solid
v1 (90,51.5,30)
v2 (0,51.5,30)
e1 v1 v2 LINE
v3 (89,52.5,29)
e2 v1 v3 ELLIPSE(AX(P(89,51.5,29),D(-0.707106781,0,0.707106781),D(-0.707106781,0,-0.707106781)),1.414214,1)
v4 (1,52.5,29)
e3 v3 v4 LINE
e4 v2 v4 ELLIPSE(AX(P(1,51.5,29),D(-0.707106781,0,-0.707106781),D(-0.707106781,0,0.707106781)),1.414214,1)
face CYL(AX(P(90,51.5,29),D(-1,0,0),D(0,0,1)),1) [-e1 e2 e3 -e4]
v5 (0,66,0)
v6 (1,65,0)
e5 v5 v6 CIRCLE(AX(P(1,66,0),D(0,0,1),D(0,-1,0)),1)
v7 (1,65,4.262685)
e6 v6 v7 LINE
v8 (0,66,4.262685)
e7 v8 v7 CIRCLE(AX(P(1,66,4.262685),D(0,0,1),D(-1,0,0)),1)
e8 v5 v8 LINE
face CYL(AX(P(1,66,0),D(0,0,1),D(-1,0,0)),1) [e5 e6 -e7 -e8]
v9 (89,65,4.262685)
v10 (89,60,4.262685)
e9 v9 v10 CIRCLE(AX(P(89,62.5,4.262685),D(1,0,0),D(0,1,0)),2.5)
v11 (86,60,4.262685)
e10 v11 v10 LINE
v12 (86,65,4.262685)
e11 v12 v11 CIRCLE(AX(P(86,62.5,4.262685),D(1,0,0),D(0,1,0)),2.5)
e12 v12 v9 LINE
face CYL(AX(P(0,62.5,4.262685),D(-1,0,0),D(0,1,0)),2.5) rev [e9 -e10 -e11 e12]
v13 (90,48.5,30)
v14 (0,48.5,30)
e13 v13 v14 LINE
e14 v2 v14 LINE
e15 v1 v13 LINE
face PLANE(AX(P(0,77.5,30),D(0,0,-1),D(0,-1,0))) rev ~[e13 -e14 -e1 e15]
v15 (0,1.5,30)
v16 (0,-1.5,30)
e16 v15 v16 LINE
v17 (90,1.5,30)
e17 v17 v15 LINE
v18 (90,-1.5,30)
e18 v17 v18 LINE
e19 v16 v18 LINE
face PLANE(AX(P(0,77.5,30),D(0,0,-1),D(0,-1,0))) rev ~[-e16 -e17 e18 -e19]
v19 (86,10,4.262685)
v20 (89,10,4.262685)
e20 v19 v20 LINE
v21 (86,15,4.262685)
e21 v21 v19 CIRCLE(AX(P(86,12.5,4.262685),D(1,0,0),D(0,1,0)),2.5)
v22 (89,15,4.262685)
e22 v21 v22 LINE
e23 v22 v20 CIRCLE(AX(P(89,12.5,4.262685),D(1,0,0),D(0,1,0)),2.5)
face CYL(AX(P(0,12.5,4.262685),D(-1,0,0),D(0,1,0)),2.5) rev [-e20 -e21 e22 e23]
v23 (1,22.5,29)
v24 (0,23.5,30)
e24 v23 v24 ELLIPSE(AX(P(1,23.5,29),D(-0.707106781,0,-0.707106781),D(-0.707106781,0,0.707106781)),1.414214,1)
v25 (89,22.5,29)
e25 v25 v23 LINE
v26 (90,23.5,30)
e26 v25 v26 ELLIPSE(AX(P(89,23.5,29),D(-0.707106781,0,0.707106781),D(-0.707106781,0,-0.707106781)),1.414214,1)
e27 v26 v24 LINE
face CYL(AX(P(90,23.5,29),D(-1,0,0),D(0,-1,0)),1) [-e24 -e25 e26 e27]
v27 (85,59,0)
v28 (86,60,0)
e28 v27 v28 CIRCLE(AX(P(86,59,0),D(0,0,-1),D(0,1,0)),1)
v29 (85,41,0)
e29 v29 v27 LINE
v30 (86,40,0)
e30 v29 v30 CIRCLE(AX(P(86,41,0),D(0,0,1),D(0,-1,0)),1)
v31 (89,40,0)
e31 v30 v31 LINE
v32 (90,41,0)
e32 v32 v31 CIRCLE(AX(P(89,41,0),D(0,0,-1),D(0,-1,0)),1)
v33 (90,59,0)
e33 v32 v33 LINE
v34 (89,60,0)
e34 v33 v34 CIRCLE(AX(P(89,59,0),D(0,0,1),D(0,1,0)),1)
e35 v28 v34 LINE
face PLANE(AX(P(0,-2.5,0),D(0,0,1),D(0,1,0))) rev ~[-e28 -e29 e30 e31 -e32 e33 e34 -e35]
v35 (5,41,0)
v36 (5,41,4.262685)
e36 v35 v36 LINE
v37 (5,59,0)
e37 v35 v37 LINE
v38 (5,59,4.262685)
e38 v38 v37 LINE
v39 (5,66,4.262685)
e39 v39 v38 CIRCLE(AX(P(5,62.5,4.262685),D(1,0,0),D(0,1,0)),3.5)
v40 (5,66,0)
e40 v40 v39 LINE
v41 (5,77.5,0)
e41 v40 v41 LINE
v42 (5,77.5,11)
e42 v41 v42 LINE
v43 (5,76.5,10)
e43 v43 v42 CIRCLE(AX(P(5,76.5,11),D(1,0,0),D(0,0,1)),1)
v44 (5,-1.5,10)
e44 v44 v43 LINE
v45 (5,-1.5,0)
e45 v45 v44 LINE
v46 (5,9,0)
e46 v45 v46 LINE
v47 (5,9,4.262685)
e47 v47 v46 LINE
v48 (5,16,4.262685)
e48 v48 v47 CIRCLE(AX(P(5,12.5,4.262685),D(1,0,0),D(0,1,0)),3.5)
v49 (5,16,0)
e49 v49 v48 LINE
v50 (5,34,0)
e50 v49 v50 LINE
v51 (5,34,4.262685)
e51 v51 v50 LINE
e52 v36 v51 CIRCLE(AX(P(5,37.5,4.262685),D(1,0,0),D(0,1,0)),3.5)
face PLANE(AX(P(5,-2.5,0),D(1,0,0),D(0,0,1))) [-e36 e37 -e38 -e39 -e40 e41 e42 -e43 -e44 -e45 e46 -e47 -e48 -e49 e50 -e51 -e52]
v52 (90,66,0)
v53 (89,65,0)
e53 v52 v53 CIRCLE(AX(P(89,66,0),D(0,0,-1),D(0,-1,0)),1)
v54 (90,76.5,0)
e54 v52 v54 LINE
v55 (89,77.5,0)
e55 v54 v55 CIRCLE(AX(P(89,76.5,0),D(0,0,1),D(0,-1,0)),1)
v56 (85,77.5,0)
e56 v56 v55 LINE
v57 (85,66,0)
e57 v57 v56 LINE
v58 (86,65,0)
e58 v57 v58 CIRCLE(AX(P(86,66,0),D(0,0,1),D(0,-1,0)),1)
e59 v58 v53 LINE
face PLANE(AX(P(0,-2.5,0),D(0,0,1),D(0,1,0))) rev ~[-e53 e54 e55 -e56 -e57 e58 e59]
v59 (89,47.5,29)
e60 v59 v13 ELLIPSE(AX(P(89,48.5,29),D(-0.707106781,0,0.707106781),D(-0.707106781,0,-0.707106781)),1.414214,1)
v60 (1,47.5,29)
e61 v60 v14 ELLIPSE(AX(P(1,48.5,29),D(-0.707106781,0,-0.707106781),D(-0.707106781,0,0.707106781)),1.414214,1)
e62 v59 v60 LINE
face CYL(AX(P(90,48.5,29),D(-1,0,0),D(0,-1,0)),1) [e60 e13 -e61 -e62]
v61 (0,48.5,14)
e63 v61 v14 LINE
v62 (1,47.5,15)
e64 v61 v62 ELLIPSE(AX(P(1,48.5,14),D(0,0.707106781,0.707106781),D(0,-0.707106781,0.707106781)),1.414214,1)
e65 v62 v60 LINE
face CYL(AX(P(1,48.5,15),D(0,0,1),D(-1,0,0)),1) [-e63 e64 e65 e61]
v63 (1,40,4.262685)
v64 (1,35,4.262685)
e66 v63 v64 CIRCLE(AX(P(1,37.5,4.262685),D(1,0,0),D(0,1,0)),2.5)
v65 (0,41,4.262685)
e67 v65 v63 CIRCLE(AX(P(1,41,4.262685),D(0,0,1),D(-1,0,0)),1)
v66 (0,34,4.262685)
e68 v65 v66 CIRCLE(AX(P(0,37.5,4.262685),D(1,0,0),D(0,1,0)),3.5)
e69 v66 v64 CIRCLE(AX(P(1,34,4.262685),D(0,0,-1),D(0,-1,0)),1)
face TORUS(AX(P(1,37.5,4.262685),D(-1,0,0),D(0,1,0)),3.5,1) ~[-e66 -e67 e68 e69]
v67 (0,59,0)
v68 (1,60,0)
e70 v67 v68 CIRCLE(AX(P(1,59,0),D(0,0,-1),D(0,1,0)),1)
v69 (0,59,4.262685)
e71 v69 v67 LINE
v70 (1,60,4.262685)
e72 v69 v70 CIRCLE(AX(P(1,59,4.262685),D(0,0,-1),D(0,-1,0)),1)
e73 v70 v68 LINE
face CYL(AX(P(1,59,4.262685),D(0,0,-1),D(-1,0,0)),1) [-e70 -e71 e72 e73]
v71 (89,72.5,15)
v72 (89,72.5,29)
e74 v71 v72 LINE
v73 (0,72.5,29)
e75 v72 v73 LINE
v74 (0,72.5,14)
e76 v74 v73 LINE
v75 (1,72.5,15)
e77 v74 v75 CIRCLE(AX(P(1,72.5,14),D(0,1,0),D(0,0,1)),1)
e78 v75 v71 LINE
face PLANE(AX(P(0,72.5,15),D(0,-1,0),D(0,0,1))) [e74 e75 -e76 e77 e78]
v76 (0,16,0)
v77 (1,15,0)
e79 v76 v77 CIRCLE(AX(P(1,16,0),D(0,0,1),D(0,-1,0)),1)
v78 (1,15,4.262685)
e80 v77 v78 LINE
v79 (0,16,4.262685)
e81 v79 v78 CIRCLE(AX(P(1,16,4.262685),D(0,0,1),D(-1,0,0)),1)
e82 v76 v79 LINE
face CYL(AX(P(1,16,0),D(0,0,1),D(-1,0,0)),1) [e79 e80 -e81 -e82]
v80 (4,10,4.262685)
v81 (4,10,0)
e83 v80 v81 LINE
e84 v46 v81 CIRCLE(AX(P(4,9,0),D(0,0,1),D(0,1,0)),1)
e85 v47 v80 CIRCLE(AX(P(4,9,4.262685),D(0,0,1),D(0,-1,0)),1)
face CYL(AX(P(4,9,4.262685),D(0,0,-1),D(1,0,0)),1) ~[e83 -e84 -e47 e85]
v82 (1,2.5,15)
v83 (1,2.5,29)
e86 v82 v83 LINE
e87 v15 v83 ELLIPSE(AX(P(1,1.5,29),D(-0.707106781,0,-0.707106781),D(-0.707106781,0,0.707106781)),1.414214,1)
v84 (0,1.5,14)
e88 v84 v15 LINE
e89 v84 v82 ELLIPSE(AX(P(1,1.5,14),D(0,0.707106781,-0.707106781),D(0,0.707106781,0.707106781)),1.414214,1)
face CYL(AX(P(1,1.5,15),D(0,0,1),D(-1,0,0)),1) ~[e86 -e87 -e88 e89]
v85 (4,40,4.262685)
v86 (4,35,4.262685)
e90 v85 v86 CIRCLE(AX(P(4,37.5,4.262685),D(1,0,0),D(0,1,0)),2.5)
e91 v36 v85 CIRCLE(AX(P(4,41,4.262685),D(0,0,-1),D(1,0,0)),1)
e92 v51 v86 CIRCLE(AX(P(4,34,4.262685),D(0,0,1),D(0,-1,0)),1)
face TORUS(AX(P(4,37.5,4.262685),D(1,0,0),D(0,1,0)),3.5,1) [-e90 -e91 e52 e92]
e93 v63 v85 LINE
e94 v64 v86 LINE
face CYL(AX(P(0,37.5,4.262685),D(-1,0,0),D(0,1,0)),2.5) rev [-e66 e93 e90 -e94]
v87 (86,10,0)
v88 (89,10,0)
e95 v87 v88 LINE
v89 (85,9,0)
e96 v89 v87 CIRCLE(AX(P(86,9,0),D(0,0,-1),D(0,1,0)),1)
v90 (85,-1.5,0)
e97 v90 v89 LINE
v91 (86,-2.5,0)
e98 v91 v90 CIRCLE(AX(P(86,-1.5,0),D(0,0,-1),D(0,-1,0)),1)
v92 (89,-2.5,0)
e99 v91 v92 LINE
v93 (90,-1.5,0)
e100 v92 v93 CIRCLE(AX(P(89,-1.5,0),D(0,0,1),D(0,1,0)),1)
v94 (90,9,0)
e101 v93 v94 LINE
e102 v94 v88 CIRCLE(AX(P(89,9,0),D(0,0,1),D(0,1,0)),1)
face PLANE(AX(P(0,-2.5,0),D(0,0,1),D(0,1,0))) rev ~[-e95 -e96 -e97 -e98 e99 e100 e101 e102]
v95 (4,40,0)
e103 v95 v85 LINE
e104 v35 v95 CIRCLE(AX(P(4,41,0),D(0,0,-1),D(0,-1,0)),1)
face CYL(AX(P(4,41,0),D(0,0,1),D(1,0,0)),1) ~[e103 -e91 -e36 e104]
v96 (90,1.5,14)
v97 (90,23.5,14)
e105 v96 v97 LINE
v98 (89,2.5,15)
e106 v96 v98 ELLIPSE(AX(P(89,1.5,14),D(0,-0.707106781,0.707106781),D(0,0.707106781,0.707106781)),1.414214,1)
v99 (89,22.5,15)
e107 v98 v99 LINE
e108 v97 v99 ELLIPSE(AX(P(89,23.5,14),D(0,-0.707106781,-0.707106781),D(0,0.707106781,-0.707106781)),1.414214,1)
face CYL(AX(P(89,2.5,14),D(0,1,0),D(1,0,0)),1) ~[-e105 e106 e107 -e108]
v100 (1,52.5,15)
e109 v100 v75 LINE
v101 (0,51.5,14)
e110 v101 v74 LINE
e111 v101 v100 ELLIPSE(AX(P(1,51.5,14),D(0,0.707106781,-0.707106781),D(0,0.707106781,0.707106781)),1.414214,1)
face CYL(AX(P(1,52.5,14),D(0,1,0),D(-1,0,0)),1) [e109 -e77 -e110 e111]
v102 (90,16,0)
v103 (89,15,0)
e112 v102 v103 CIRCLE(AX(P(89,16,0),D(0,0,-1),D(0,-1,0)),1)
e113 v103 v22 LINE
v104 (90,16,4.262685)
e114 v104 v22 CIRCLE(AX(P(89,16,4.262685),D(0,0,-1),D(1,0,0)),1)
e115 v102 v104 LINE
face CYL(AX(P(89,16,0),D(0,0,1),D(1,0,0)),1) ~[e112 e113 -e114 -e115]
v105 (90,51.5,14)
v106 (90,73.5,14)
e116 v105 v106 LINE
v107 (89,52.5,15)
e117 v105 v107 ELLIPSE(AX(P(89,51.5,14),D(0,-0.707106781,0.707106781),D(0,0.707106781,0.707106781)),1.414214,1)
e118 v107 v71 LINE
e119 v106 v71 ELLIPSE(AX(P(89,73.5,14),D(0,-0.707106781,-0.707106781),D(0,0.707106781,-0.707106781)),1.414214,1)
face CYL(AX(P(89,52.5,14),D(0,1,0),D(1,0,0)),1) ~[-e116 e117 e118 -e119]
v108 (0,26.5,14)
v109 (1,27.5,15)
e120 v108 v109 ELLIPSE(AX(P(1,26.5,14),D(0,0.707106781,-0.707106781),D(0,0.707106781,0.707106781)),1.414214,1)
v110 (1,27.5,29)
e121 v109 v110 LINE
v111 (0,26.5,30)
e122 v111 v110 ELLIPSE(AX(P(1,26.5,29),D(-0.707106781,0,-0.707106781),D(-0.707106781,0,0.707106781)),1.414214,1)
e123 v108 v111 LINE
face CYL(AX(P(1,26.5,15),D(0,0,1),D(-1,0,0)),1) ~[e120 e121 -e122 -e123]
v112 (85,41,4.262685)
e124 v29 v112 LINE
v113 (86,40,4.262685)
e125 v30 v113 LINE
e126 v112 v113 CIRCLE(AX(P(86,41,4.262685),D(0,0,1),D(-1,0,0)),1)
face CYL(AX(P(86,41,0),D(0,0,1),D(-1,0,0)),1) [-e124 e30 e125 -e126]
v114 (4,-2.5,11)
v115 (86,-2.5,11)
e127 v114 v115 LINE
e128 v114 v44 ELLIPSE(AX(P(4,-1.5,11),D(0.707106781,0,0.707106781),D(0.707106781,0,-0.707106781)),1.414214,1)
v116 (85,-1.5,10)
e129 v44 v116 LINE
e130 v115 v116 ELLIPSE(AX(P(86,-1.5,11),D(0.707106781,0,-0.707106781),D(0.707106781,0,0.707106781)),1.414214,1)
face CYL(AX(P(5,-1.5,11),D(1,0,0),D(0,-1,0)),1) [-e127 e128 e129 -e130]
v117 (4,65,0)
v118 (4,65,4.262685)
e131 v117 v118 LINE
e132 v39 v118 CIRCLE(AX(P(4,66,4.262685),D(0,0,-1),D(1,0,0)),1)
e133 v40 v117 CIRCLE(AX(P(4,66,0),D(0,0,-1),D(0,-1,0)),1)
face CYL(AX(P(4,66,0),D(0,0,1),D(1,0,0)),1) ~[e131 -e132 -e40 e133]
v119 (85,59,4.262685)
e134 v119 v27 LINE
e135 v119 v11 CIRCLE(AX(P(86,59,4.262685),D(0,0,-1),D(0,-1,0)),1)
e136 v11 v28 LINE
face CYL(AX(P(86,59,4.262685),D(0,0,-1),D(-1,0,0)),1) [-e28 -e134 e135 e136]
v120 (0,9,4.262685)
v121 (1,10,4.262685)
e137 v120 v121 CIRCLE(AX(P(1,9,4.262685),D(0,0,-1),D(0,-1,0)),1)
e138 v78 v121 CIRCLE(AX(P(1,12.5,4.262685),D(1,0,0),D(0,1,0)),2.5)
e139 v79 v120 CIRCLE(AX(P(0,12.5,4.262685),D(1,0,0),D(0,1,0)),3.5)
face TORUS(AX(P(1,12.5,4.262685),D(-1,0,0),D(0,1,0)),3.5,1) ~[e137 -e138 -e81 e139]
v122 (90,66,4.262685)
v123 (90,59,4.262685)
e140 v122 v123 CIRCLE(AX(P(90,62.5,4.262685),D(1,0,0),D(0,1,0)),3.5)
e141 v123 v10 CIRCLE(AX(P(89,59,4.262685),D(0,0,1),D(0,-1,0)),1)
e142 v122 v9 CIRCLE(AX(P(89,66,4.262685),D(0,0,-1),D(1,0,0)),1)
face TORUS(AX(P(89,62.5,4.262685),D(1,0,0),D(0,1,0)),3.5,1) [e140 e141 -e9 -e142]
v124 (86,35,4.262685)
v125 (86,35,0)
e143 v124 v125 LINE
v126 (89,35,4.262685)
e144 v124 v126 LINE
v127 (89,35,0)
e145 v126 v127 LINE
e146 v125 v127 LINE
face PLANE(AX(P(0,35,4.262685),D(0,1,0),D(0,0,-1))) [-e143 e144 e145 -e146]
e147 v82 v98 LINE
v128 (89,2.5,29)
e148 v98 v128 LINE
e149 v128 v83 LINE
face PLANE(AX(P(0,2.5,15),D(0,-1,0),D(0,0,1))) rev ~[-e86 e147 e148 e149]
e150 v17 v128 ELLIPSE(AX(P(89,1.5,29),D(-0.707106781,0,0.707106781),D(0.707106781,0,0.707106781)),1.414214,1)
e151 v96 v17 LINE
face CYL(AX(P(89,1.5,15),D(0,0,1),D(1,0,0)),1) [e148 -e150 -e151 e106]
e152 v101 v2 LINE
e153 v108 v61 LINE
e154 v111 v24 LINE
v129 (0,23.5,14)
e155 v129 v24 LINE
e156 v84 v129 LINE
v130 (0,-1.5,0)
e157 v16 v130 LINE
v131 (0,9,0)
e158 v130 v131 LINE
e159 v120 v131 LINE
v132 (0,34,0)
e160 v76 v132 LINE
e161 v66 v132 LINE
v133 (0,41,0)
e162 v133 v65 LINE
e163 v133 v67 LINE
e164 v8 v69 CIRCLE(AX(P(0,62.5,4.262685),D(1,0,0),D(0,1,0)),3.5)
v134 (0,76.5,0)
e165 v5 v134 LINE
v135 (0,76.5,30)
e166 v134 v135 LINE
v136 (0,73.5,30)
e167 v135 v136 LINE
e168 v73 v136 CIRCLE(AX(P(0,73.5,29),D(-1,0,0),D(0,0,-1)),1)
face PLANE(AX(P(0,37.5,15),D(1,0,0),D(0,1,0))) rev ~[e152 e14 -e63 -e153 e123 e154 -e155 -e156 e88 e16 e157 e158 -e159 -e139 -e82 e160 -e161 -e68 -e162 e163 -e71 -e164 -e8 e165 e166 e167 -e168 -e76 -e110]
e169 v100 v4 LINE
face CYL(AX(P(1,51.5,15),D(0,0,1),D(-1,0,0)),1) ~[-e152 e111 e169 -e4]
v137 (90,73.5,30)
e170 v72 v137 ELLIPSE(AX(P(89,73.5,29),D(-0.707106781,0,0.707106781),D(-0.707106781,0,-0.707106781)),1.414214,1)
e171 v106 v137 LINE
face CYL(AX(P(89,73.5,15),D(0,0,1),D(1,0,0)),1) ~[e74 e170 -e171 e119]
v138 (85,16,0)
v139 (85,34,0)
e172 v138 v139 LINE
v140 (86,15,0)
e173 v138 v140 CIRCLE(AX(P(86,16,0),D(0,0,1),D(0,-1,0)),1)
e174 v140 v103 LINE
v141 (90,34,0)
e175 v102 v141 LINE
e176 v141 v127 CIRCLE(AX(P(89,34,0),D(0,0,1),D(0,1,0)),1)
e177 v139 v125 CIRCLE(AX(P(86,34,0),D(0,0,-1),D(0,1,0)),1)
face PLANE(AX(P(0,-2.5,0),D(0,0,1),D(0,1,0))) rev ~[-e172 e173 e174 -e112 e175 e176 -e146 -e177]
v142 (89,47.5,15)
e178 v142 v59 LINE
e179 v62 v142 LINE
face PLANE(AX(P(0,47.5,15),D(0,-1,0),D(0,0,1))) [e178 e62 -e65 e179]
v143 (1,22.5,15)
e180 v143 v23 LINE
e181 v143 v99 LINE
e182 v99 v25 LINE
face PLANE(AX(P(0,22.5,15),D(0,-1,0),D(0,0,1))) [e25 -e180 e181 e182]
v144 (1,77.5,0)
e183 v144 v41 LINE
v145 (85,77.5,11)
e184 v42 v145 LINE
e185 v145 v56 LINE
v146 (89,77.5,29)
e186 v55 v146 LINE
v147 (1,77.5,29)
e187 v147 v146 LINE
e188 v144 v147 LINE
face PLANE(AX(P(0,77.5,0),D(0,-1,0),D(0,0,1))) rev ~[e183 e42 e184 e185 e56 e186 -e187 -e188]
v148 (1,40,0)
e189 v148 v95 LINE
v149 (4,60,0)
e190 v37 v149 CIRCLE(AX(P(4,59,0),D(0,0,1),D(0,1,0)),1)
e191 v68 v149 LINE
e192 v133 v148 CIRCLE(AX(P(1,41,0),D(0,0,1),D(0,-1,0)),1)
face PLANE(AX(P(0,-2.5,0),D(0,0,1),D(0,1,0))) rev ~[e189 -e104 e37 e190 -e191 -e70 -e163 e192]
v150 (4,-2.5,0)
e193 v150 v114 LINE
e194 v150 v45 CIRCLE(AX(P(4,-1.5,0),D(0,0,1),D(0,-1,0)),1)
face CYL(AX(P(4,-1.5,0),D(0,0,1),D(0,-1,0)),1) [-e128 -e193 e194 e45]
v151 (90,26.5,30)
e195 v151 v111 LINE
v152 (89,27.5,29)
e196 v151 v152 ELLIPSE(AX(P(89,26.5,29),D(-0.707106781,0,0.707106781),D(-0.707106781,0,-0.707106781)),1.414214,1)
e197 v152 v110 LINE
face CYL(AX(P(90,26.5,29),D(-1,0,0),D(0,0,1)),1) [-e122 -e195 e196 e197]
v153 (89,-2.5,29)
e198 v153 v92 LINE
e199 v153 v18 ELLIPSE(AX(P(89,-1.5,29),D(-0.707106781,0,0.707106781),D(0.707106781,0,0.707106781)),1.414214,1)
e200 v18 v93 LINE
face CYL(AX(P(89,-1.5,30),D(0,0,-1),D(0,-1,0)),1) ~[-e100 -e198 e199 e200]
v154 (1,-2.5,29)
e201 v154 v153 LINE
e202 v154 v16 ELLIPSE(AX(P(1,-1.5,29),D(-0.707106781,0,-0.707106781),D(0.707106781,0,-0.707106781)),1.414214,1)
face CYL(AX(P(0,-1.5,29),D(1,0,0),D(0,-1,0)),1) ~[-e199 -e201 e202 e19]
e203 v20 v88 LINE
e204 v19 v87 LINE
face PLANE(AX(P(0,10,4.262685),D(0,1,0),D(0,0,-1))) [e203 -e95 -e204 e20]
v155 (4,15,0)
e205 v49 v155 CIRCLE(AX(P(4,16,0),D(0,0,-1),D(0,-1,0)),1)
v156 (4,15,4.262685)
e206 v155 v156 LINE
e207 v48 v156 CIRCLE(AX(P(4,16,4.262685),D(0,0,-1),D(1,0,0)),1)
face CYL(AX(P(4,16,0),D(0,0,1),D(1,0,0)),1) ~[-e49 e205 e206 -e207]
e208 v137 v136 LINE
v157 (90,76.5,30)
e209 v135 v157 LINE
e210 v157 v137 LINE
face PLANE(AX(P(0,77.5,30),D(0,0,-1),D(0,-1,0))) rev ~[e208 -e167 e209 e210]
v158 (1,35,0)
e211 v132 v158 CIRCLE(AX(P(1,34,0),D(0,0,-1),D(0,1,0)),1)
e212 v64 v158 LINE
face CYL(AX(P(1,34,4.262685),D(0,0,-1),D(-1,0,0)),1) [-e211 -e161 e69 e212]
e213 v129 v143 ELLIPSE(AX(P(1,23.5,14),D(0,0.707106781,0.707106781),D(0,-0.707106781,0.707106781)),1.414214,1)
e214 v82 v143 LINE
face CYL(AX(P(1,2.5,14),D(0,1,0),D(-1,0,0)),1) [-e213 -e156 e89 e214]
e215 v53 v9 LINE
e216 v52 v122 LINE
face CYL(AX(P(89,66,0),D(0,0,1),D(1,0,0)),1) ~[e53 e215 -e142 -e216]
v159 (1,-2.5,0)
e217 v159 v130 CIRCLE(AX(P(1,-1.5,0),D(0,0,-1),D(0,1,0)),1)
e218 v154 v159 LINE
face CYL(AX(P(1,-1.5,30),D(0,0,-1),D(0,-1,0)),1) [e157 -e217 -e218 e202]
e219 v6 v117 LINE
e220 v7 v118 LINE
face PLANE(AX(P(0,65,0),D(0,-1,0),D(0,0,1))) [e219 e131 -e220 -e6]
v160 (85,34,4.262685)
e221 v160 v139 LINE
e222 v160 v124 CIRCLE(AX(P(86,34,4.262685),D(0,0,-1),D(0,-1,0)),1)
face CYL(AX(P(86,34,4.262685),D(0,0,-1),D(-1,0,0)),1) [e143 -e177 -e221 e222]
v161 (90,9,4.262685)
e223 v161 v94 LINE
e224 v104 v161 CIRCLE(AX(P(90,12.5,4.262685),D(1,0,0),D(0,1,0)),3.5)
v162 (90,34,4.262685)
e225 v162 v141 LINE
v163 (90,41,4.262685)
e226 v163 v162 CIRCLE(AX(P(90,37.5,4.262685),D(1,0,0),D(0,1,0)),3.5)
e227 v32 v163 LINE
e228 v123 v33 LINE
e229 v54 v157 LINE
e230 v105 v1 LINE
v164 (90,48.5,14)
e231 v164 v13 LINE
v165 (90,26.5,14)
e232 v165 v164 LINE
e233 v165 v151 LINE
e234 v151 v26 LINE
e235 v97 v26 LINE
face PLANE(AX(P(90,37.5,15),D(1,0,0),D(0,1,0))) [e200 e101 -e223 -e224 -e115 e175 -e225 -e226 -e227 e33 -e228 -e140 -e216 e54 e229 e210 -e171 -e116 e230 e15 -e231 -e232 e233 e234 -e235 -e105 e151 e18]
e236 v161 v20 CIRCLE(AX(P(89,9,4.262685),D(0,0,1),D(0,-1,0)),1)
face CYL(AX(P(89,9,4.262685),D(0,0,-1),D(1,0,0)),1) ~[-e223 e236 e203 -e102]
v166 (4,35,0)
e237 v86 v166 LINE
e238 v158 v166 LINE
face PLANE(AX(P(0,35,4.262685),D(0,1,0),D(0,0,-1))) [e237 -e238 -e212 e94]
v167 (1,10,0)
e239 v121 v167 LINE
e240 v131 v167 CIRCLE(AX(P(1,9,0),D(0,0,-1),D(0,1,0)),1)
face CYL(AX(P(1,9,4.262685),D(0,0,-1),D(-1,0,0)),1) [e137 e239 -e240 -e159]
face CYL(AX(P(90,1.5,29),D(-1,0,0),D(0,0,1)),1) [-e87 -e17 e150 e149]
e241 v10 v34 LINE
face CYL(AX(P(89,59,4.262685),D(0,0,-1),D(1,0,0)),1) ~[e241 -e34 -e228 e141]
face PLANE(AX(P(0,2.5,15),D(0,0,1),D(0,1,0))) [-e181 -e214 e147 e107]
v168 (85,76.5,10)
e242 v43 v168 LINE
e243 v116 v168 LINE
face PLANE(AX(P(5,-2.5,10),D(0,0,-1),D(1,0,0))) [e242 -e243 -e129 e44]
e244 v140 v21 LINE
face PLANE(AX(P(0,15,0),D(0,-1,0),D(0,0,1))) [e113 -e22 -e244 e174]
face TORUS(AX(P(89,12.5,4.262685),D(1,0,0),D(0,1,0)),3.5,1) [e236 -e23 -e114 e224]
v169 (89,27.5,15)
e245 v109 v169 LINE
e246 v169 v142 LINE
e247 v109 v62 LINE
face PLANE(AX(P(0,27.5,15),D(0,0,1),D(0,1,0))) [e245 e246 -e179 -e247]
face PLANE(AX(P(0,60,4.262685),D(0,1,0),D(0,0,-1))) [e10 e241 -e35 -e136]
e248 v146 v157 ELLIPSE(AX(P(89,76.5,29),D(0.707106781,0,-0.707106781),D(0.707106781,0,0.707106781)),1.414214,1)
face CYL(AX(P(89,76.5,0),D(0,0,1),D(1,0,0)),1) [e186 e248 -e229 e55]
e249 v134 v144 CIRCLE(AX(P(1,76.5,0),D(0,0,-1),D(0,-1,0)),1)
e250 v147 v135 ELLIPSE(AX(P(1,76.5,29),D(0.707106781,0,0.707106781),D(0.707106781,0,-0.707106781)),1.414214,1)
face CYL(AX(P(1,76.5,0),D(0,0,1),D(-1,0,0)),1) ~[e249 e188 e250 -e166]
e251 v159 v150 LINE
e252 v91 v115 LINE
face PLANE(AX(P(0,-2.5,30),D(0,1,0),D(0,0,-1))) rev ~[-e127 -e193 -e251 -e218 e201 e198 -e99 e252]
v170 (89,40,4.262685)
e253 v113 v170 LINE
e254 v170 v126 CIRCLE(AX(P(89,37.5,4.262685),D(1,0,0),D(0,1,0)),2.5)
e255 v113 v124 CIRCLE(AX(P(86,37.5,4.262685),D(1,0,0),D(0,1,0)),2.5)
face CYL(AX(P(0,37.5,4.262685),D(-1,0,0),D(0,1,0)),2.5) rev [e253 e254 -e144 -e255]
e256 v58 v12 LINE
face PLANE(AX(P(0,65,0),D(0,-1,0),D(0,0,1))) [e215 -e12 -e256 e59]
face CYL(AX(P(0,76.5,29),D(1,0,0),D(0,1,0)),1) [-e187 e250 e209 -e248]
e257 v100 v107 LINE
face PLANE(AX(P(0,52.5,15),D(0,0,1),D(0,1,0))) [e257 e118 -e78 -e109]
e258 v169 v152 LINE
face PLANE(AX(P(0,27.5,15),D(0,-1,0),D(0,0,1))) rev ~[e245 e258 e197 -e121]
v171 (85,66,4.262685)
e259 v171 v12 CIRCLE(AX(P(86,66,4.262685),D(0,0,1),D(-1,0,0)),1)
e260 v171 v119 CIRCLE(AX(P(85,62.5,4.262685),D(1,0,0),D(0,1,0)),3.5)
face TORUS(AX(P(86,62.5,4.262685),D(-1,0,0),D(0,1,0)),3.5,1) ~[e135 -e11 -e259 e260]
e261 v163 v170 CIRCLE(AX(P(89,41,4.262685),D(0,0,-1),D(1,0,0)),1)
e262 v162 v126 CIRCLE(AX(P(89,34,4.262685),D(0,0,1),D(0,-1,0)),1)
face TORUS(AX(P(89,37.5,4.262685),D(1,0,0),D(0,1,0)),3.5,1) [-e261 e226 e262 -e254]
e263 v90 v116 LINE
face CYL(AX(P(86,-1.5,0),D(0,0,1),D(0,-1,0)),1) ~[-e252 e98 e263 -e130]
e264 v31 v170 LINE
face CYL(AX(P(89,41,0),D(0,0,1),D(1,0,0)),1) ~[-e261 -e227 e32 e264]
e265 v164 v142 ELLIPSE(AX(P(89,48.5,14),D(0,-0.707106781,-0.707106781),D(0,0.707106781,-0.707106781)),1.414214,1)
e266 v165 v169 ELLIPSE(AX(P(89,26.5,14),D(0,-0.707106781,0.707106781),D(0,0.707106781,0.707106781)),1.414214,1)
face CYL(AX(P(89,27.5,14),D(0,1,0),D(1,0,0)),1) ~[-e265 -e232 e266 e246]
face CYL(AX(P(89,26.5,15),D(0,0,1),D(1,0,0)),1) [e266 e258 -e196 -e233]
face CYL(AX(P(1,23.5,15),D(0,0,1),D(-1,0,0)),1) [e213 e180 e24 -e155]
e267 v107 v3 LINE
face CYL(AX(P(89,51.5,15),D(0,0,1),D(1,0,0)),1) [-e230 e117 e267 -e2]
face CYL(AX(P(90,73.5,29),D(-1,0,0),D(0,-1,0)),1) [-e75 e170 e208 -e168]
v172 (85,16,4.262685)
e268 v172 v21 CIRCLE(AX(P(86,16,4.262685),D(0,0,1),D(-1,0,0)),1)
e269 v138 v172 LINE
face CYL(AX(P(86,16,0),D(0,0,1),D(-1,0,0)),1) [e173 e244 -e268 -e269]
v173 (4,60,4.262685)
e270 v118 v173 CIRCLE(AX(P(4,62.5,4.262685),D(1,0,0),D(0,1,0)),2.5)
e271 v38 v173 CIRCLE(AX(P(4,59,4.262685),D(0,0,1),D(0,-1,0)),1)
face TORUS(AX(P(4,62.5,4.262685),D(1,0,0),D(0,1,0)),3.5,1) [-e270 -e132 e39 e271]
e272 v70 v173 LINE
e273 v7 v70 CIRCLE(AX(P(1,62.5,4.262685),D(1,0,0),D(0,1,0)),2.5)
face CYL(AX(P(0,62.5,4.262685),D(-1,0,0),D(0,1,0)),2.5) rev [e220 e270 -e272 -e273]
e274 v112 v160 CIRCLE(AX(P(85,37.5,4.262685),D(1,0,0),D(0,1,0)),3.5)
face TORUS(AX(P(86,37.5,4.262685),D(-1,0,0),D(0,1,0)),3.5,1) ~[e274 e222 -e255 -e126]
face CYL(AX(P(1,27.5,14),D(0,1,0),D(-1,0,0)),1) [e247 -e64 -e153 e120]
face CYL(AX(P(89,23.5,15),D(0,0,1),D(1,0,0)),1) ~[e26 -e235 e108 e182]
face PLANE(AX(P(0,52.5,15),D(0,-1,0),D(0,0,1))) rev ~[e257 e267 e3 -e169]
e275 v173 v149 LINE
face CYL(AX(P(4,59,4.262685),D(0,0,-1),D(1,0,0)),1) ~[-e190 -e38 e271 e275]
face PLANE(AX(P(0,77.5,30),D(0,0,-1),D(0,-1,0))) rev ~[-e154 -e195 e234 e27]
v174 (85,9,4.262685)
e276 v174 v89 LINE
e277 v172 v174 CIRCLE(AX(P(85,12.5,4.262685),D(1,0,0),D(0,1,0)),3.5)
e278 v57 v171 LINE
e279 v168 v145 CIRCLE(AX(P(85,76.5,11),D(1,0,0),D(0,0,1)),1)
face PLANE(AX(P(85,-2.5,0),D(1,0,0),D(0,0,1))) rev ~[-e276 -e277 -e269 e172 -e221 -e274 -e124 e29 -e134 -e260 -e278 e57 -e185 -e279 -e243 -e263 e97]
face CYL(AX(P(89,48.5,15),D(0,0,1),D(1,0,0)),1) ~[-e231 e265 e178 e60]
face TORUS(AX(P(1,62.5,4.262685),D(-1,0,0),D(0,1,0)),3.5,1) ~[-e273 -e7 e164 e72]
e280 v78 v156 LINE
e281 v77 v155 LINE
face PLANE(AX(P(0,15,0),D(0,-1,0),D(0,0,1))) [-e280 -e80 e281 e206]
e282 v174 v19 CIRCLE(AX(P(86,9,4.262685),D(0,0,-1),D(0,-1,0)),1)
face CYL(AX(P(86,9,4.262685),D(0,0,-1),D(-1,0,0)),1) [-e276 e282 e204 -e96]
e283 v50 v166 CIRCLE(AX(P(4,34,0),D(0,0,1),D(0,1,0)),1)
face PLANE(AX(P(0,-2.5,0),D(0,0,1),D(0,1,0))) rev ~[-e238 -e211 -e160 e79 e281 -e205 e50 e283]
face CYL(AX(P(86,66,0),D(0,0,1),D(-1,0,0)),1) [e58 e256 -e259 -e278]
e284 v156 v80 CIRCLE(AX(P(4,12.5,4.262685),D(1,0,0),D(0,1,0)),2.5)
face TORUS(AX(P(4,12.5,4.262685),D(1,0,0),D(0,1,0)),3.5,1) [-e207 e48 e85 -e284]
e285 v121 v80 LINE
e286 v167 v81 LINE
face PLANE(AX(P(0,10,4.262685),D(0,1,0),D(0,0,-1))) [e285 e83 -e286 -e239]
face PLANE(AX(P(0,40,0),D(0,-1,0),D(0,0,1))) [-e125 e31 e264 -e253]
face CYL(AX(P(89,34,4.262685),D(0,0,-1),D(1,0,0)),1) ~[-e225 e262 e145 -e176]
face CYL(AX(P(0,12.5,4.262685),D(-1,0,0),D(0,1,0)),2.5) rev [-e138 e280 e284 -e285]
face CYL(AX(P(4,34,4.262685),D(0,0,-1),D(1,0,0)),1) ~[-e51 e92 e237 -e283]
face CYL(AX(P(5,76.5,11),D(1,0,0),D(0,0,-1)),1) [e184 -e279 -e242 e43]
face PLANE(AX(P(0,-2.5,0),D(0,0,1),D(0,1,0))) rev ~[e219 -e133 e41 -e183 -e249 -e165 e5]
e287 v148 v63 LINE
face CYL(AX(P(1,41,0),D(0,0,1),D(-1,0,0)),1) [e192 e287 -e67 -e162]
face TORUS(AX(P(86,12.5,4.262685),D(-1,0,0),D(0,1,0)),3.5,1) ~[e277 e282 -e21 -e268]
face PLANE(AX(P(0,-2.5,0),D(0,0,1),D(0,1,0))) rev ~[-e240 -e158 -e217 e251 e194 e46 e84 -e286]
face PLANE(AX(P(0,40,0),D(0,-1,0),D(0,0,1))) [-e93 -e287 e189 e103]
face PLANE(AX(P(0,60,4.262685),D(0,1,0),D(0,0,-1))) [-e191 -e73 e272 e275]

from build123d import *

# Parameters (mm, degrees)
F1_DEPTH = 90
F3_DEPTH = 90
F4_W     = 20
F4_H     = 30
F5_DEPTH = 90
F6_W     = 80
F6_H     = 10
F7_DEPTH = 90
F8_R     = 1


with BuildPart() as f1:
    # F0 (on Right) → F1 (new body)
    with BuildSketch(Plane.YZ):
        Polygon((-2.5, 30), (-2.5, 0), (0, 0), (77.5, 0), (77.5, 30), align=None)
    extrude(amount=F1_DEPTH)

    # F2 (on Right) → F3 (cut)
    with BuildSketch(Plane.YZ):
        with BuildLine():
            ThreePointArc((10, 4.2626853101), (12.5, 1.7626853101), (15, 4.2626853101))
            ThreePointArc((15, 4.2626853101), (12.5, 6.7626853101), (10, 4.2626853101))
        make_face()
        with BuildLine():
            Line((15, 0), (15, 4.2626853101))
            ThreePointArc((15, 4.2626853101), (12.5, 1.7626853101), (10, 4.2626853101))
            Line((10, 4.2626853101), (10, 0))
            Line((10, 0), (15, 0))
        make_face()
        with BuildLine():
            ThreePointArc((35, 4.2626853101), (37.5, 1.7626853101), (40, 4.2626853101))
            ThreePointArc((40, 4.2626853101), (37.5, 6.7626853101), (35, 4.2626853101))
        make_face()
        with BuildLine():
            Line((40, 0), (40, 4.2626853101))
            ThreePointArc((40, 4.2626853101), (37.5, 1.7626853101), (35, 4.2626853101))
            Line((35, 4.2626853101), (35, 0))
            Line((35, 0), (40, 0))
        make_face()
        with BuildLine():
            ThreePointArc((60, 4.2626853101), (62.5, 1.7626853101), (65, 4.2626853101))
            ThreePointArc((65, 4.2626853101), (62.5, 6.7626853101), (60, 4.2626853101))
        make_face()
        with BuildLine():
            Line((65, 0), (65, 4.2626853101))
            ThreePointArc((65, 4.2626853101), (62.5, 1.7626853101), (60, 4.2626853101))
            Line((60, 4.2626853101), (60, 0))
            Line((60, 0), (65, 0))
        make_face()
    extrude(amount=F3_DEPTH, mode=Mode.SUBTRACT)

    # F4 (on Right) → F5 (cut)
    with BuildSketch(Plane.YZ):
        with Locations((12.4999999974, 30)):
            Rectangle(F4_W, F4_H)
        with Locations((37.4999999974, 30)):
            Rectangle(F4_W, F4_H)
        with Locations((62.4999999974, 30)):
            Rectangle(F4_W, F4_H)
    extrude(amount=F5_DEPTH, mode=Mode.SUBTRACT)

    # F6 (on face) → F7 (cut)
    with BuildSketch(Plane.XZ.offset(2.5)):
        with Locations((45, 5)):
            Rectangle(F6_W, F6_H)
    extrude(amount=-F7_DEPTH, mode=Mode.SUBTRACT)

    # F8
    f8_edges = [f1.edges().sort_by_distance(p)[0] for p in [
        (45, -2.5, 30),
        (45, 22.5, 30),
        (45, 47.5, 30),
        (45, 72.5, 30),
        (45, 27.5, 30),
        (45, 52.5, 30),
        (90, 12.5, 15),
        (90, 37.5, 15),
        (90, 62.5, 15),
        (90, -2.5, 15),
        (0, -2.5, 15),
        (45, -2.5, 10),
        (45, 77.5, 30),
        (5, -2.5, 5),
        (85, -2.5, 5),
        (85, 15, 2.131343),
        (85, 35, 2.131343),
        (85, 60, 2.131343),
        (5, 15, 2.131343),
        (5, 35, 2.131343),
        (5, 60, 2.131343),
        (90, 77.5, 15),
        (0, 77.5, 15),
        (0, 22.5, 22.5),
        (0, 27.5, 22.5),
        (0, 47.5, 22.5),
        (0, 52.5, 22.5),
        (0, 2.5, 22.5),
        (90, 27.5, 22.5),
        (90, 22.5, 22.5),
        (90, 2.5, 22.5),
        (90, 47.5, 22.5),
        (90, 52.5, 22.5),
        (90, 72.5, 22.5),
        (45, 2.5, 30),
        (90, 15, 2.131343),
        (90, 40, 2.131343),
        (90, 65, 2.131343),
        (0, 65, 2.131343),
        (0, 40, 2.131343),
        (0, 15, 2.131343),
        (0, 12.5, 15),
        (0, 37.5, 15),
        (0, 62.5, 15),
        (0, 62.5, 6.762685),
        (0, 60, 2.131343),
        (0, 37.5, 6.762685),
        (0, 35, 2.131343),
        (0, 12.5, 6.762685),
        (0, 10, 2.131343),
        (5, 10, 2.131343),
        (5, 12.5, 6.762685),
        (5, 37.5, 6.762685),
        (5, 40, 2.131343),
        (5, 62.5, 6.762685),
        (5, 65, 2.131343),
        (45, 77.5, 10),
        (85, 65, 2.131343),
        (85, 62.5, 6.762685),
        (85, 40, 2.131343),
        (85, 37.5, 6.762685),
        (85, 12.5, 6.762685),
        (85, 10, 2.131343),
        (90, 62.5, 6.762685),
        (90, 60, 2.131343),
        (90, 37.5, 6.762685),
        (90, 35, 2.131343),
        (90, 12.5, 6.762685),
        (90, 10, 2.131343),
    ]]
    fillet(f8_edges, radius=F8_R)


solid = f1.part
